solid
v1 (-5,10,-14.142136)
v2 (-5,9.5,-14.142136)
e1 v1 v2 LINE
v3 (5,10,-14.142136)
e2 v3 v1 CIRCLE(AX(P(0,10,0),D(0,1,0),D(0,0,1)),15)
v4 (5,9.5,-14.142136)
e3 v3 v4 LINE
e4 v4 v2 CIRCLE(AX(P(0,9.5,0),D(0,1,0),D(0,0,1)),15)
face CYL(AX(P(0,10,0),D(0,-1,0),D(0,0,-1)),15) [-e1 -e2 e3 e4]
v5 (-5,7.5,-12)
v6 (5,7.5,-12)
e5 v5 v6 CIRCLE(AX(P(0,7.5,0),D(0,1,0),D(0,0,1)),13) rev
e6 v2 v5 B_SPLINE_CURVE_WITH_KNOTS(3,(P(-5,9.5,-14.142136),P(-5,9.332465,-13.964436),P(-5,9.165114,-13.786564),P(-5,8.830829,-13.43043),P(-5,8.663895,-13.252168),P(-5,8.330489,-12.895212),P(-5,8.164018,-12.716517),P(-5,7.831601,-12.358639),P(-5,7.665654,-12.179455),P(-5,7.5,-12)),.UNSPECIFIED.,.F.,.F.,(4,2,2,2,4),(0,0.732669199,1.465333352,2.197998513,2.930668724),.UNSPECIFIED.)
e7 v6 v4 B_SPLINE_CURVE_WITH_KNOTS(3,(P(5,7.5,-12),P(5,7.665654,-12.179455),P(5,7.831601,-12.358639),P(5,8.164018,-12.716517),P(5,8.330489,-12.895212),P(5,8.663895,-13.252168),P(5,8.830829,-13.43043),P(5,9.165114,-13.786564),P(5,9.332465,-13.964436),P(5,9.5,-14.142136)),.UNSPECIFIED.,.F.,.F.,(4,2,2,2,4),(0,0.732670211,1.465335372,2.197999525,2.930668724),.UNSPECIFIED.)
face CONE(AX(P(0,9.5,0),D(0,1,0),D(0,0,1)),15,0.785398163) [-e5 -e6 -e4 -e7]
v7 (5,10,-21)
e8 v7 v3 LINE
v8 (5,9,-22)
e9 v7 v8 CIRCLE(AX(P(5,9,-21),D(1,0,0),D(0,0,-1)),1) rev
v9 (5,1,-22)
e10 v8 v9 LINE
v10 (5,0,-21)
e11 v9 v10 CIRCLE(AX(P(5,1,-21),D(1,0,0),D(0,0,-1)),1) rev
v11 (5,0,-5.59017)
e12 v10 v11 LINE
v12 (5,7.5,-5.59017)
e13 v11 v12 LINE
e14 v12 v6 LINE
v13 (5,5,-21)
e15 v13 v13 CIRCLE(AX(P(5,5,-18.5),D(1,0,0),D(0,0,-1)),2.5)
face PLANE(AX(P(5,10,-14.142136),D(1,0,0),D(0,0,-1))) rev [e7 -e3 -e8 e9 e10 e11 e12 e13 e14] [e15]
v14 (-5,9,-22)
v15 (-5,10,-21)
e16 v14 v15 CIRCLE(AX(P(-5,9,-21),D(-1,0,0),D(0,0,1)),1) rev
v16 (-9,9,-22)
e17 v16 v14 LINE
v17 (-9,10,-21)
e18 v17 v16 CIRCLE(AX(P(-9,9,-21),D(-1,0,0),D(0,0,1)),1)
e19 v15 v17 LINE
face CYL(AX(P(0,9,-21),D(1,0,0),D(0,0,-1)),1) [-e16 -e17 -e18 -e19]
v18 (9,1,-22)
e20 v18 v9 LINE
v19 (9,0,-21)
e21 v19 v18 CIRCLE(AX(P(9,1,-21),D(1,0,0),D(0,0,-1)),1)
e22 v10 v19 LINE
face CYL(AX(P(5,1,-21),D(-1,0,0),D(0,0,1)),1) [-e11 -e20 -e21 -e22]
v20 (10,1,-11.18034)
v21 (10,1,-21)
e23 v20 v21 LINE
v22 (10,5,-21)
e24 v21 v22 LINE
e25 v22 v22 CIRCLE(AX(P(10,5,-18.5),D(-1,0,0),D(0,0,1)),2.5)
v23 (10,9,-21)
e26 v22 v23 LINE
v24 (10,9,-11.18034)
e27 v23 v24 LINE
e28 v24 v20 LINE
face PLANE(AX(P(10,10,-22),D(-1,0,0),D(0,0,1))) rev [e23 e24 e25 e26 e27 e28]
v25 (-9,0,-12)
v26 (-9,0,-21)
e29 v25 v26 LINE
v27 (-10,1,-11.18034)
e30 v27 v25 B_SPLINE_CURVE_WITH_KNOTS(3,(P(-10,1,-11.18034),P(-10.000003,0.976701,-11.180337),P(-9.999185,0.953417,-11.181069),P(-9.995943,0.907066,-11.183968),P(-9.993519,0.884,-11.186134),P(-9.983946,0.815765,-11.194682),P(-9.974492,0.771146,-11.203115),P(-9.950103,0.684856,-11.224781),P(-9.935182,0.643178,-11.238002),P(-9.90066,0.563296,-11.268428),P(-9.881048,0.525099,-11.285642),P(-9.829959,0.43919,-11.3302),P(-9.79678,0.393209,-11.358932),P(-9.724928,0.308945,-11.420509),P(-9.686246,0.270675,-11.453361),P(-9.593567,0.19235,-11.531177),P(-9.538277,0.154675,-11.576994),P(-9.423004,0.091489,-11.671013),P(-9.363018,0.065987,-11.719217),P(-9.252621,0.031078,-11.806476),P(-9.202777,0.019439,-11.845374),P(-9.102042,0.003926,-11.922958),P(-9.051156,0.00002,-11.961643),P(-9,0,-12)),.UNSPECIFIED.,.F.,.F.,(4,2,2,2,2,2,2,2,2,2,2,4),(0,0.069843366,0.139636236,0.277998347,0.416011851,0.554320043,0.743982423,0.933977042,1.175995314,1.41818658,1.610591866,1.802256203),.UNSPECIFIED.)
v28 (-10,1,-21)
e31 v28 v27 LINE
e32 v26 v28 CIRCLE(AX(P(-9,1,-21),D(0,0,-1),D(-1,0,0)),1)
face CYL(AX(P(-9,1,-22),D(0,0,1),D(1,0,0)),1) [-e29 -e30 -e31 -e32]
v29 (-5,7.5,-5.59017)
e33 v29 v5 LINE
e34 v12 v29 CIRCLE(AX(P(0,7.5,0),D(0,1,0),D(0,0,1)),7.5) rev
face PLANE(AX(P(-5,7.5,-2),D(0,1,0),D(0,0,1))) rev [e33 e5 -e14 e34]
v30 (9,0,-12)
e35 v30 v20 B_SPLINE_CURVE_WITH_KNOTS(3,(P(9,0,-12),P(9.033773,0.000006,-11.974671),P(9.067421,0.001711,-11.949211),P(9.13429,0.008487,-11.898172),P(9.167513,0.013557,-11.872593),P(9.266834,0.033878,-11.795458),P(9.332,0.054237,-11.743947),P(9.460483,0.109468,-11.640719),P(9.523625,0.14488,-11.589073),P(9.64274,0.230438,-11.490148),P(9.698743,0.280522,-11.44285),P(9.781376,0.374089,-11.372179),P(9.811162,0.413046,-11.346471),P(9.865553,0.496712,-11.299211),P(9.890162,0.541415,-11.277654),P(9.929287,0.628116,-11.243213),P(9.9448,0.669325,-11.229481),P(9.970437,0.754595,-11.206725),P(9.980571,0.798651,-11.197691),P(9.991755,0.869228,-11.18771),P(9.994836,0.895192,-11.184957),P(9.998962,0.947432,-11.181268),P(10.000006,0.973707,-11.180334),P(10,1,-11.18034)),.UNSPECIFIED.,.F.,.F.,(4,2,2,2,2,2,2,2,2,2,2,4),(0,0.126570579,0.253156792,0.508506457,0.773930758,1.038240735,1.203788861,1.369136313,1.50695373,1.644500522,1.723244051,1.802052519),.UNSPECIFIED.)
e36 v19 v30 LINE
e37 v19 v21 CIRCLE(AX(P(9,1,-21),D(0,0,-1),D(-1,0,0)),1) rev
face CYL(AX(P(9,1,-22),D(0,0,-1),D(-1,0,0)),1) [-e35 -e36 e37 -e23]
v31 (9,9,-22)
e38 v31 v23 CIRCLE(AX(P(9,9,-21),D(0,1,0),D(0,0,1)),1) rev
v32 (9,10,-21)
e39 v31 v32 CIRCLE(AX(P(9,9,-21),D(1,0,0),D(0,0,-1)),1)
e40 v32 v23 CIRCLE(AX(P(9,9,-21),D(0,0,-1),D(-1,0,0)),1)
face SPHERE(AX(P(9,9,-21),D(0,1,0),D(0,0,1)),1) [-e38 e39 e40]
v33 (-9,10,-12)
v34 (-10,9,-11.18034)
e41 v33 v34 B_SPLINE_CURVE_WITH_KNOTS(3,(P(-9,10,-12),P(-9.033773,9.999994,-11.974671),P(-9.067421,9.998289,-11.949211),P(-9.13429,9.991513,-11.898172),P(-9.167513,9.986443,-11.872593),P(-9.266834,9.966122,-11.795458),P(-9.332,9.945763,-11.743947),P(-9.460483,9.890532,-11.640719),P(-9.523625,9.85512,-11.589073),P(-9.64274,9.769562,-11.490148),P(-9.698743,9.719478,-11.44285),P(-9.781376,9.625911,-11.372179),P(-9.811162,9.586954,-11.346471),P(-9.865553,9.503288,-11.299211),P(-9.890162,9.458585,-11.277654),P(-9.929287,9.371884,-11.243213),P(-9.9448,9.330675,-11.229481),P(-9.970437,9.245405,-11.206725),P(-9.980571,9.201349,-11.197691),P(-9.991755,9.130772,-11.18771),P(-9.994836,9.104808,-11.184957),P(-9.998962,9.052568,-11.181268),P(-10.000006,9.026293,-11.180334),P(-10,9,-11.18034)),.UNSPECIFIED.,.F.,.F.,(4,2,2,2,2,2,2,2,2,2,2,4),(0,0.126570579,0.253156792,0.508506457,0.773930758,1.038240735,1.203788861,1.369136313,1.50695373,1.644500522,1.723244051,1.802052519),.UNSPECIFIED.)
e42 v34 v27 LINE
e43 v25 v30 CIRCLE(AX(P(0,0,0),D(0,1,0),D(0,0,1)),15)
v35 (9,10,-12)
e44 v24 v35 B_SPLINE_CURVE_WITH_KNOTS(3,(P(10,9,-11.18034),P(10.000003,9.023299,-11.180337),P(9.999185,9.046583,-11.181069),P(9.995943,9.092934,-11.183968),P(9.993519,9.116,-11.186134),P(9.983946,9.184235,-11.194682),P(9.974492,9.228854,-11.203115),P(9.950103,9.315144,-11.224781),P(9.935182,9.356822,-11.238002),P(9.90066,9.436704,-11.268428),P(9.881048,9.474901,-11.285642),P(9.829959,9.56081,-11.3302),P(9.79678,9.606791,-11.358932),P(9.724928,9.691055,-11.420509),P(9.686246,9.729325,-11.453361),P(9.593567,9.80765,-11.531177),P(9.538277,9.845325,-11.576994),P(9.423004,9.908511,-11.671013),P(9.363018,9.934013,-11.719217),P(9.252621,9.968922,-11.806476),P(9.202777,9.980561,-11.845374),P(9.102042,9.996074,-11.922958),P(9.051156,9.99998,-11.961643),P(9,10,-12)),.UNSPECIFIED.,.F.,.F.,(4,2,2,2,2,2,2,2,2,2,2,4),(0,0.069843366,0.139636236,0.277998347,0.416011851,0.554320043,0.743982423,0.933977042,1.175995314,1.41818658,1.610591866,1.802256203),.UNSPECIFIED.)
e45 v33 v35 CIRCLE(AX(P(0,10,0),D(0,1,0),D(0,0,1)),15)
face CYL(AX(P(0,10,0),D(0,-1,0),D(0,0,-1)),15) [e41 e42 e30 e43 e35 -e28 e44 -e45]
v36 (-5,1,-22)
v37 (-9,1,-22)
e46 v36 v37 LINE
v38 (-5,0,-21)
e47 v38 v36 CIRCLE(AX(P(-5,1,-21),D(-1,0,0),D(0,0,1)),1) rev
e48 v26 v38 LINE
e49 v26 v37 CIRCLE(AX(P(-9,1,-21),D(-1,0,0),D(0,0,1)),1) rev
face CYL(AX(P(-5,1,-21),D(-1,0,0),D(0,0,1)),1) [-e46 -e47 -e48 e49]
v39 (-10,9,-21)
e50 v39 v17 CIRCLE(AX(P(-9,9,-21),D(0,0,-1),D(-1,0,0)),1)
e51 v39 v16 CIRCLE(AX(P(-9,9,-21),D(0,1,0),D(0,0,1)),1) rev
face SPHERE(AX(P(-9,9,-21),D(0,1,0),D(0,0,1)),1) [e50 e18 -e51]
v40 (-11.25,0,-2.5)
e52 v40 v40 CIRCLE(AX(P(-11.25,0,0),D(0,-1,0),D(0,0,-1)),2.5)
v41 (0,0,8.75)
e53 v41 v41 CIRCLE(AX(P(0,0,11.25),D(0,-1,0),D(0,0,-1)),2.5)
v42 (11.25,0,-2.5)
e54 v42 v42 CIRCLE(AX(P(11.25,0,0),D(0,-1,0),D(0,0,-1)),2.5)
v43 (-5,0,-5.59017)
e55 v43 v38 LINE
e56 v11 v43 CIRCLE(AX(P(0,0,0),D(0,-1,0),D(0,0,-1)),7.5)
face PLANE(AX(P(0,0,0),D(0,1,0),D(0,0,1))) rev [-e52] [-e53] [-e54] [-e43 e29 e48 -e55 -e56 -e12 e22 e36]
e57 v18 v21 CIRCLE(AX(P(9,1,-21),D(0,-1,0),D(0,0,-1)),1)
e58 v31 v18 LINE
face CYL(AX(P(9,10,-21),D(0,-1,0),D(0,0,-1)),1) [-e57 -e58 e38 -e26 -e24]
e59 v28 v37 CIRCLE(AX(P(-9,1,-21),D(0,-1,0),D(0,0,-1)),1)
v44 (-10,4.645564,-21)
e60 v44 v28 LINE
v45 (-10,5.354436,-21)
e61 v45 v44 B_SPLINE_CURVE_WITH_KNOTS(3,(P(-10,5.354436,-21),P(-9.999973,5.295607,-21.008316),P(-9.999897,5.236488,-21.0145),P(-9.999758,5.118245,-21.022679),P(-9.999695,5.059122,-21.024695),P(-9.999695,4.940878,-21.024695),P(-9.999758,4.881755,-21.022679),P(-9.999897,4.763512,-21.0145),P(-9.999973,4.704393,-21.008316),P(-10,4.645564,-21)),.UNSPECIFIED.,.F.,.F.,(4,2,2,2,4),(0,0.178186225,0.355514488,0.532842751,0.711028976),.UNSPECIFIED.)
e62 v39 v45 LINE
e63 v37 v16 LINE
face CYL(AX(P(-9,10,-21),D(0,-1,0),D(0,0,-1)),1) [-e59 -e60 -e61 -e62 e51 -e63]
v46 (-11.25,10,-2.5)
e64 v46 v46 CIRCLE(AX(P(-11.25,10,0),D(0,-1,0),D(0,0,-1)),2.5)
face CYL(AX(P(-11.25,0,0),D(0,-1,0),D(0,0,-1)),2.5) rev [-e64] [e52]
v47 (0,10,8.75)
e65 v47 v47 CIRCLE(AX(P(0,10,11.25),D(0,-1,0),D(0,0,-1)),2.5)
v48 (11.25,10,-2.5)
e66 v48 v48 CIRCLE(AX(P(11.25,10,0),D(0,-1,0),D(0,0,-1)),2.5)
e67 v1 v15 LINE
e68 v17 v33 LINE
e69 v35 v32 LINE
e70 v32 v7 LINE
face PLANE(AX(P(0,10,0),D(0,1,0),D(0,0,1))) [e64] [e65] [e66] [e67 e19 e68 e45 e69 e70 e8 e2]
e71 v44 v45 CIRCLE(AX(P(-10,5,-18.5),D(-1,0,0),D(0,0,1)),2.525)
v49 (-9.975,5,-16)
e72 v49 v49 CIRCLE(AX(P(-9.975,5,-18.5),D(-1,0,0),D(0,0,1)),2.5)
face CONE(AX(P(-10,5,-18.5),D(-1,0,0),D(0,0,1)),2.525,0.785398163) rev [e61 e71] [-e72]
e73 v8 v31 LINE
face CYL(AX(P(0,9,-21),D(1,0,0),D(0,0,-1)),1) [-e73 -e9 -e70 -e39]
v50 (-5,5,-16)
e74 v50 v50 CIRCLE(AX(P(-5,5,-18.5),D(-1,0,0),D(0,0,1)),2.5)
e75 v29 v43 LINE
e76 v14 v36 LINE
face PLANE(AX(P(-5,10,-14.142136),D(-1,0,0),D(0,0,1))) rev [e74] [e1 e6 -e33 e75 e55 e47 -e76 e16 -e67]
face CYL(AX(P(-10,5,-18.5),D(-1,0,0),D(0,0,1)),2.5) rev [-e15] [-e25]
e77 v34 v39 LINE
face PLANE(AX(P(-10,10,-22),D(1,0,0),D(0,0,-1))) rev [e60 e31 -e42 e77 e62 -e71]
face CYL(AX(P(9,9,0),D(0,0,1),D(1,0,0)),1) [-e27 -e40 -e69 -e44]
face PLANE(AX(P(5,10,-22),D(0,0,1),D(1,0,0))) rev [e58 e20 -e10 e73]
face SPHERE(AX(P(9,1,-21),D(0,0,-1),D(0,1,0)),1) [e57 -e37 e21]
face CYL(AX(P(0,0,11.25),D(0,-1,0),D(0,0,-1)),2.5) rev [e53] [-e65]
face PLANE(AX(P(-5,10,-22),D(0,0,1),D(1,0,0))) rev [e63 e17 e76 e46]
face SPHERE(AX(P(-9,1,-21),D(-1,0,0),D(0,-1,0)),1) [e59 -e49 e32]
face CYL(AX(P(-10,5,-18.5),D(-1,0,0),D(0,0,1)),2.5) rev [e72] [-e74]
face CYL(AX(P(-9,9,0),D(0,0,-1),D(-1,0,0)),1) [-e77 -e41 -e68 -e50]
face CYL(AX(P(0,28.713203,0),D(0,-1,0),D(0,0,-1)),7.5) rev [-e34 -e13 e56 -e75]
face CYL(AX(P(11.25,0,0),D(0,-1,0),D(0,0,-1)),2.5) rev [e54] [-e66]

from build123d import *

# Parameters (mm, degrees)
BOSS_EXTRUDE1_DEPTH             = 10
F_5_0MM_DOWEL_HOLE1_D           = 5
F_5_0MM_DOWEL_HOLE1_CSINK_D     = 5.05
F_5_0MM_DOWEL_HOLE1_CSINK_ANGLE = 90
SKETCH5_W                       = 10
SKETCH5_H                       = 7.5
CUT_EXTRUDE1_DEPTH              = 20
SKETCH6_R                       = 7.5
CUT_EXTRUDE2_DEPTH              = 7.5
CHAMFER1_SIZE                   = 2
FILLET1_R                       = 1
F_5_0MM_DOWEL_HOLE2_D           = 5
F_5_0MM_DOWEL_HOLE2_DEPTH       = 10
F_5_0MM_DOWEL_HOLE2_TIP         = 1.502151548


with BuildPart() as part:
    # Sketch1 → Boss-Extrude1 (new body)
    with BuildSketch(Plane(origin=(0, 0, 0), x_dir=(1, 0, 0), z_dir=(0, 1, 0))):
        with BuildLine():
            Line((-5, 14.142135624), (-5, 22))
            Line((-5, 22), (-10, 22))
            Line((-10, 22), (-10, 11.180339887))
            ThreePointArc((-10, 11.180339887), (0, -15), (10, 11.180339887))
            Line((10, 11.180339887), (10, 22))
            Line((10, 22), (5, 22))
            Line((5, 22), (5, 14.142135624))
            ThreePointArc((5, 14.142135624), (0, 15), (-5, 14.142135624))
        make_face()
    extrude(amount=BOSS_EXTRUDE1_DEPTH)

    # Ø5.0mm Dowel Hole1 (through all)
    with Locations(Plane.ZY.offset(10)):
        with Locations((-18.5, 5)):
            CounterSinkHole(F_5_0MM_DOWEL_HOLE1_D / 2, F_5_0MM_DOWEL_HOLE1_CSINK_D / 2, counter_sink_angle=F_5_0MM_DOWEL_HOLE1_CSINK_ANGLE)

    # Sketch5 → Cut-Extrude1 (cut)
    with BuildSketch(Plane(origin=(0, 0, -22), x_dir=(-1, 0, 0), z_dir=(0, 0, -1))):
        with Locations((0, 3.75)):
            Rectangle(SKETCH5_W, SKETCH5_H)
    extrude(amount=-CUT_EXTRUDE1_DEPTH, mode=Mode.SUBTRACT)

    # Sketch6 → Cut-Extrude2 (cut)
    with BuildSketch(Plane.XZ):
        Circle(SKETCH6_R)
    extrude(amount=-CUT_EXTRUDE2_DEPTH, mode=Mode.SUBTRACT)

    # Chamfer1
    chamfer1_edges = [part.edges().sort_by_distance(p)[0] for p in [
        (0, 7.5, -15),
    ]]
    chamfer(chamfer1_edges, length=CHAMFER1_SIZE)

    # Fillet1
    fillet1_edges = [part.edges().sort_by_distance(p)[0] for p in [
        (-10, 0, -16.590169944),
        (-7.5, 0, -22),
        (-7.5, 10, -22),
        (10, 5, -22),
        (-10, 5, -22),
        (-10, 10, -16.590169944),
        (10, 10, -16.590169944),
        (7.5, 10, -22),
        (7.5, 0, -22),
        (10, 0, -16.590169944),
    ]]
    fillet(fillet1_edges, radius=FILLET1_R - 0.0001)  # a hair under: the kernel refuses the full size

    # Ø5.0mm Dowel Hole2
    with Locations(Plane(origin=(0, 0, 0), x_dir=(-1, 0, 0), z_dir=(0, -1, 0))):
        with Locations((-11.25, 0), (0, -11.25), (11.25, 0)):
            Hole(F_5_0MM_DOWEL_HOLE2_D / 2, depth=F_5_0MM_DOWEL_HOLE2_DEPTH)
            with Locations((0, 0, -(F_5_0MM_DOWEL_HOLE2_DEPTH + F_5_0MM_DOWEL_HOLE2_TIP / 2))):  # 118° drill point
                Cone(0, F_5_0MM_DOWEL_HOLE2_D / 2, F_5_0MM_DOWEL_HOLE2_TIP, mode=Mode.SUBTRACT)


solid = part.part
